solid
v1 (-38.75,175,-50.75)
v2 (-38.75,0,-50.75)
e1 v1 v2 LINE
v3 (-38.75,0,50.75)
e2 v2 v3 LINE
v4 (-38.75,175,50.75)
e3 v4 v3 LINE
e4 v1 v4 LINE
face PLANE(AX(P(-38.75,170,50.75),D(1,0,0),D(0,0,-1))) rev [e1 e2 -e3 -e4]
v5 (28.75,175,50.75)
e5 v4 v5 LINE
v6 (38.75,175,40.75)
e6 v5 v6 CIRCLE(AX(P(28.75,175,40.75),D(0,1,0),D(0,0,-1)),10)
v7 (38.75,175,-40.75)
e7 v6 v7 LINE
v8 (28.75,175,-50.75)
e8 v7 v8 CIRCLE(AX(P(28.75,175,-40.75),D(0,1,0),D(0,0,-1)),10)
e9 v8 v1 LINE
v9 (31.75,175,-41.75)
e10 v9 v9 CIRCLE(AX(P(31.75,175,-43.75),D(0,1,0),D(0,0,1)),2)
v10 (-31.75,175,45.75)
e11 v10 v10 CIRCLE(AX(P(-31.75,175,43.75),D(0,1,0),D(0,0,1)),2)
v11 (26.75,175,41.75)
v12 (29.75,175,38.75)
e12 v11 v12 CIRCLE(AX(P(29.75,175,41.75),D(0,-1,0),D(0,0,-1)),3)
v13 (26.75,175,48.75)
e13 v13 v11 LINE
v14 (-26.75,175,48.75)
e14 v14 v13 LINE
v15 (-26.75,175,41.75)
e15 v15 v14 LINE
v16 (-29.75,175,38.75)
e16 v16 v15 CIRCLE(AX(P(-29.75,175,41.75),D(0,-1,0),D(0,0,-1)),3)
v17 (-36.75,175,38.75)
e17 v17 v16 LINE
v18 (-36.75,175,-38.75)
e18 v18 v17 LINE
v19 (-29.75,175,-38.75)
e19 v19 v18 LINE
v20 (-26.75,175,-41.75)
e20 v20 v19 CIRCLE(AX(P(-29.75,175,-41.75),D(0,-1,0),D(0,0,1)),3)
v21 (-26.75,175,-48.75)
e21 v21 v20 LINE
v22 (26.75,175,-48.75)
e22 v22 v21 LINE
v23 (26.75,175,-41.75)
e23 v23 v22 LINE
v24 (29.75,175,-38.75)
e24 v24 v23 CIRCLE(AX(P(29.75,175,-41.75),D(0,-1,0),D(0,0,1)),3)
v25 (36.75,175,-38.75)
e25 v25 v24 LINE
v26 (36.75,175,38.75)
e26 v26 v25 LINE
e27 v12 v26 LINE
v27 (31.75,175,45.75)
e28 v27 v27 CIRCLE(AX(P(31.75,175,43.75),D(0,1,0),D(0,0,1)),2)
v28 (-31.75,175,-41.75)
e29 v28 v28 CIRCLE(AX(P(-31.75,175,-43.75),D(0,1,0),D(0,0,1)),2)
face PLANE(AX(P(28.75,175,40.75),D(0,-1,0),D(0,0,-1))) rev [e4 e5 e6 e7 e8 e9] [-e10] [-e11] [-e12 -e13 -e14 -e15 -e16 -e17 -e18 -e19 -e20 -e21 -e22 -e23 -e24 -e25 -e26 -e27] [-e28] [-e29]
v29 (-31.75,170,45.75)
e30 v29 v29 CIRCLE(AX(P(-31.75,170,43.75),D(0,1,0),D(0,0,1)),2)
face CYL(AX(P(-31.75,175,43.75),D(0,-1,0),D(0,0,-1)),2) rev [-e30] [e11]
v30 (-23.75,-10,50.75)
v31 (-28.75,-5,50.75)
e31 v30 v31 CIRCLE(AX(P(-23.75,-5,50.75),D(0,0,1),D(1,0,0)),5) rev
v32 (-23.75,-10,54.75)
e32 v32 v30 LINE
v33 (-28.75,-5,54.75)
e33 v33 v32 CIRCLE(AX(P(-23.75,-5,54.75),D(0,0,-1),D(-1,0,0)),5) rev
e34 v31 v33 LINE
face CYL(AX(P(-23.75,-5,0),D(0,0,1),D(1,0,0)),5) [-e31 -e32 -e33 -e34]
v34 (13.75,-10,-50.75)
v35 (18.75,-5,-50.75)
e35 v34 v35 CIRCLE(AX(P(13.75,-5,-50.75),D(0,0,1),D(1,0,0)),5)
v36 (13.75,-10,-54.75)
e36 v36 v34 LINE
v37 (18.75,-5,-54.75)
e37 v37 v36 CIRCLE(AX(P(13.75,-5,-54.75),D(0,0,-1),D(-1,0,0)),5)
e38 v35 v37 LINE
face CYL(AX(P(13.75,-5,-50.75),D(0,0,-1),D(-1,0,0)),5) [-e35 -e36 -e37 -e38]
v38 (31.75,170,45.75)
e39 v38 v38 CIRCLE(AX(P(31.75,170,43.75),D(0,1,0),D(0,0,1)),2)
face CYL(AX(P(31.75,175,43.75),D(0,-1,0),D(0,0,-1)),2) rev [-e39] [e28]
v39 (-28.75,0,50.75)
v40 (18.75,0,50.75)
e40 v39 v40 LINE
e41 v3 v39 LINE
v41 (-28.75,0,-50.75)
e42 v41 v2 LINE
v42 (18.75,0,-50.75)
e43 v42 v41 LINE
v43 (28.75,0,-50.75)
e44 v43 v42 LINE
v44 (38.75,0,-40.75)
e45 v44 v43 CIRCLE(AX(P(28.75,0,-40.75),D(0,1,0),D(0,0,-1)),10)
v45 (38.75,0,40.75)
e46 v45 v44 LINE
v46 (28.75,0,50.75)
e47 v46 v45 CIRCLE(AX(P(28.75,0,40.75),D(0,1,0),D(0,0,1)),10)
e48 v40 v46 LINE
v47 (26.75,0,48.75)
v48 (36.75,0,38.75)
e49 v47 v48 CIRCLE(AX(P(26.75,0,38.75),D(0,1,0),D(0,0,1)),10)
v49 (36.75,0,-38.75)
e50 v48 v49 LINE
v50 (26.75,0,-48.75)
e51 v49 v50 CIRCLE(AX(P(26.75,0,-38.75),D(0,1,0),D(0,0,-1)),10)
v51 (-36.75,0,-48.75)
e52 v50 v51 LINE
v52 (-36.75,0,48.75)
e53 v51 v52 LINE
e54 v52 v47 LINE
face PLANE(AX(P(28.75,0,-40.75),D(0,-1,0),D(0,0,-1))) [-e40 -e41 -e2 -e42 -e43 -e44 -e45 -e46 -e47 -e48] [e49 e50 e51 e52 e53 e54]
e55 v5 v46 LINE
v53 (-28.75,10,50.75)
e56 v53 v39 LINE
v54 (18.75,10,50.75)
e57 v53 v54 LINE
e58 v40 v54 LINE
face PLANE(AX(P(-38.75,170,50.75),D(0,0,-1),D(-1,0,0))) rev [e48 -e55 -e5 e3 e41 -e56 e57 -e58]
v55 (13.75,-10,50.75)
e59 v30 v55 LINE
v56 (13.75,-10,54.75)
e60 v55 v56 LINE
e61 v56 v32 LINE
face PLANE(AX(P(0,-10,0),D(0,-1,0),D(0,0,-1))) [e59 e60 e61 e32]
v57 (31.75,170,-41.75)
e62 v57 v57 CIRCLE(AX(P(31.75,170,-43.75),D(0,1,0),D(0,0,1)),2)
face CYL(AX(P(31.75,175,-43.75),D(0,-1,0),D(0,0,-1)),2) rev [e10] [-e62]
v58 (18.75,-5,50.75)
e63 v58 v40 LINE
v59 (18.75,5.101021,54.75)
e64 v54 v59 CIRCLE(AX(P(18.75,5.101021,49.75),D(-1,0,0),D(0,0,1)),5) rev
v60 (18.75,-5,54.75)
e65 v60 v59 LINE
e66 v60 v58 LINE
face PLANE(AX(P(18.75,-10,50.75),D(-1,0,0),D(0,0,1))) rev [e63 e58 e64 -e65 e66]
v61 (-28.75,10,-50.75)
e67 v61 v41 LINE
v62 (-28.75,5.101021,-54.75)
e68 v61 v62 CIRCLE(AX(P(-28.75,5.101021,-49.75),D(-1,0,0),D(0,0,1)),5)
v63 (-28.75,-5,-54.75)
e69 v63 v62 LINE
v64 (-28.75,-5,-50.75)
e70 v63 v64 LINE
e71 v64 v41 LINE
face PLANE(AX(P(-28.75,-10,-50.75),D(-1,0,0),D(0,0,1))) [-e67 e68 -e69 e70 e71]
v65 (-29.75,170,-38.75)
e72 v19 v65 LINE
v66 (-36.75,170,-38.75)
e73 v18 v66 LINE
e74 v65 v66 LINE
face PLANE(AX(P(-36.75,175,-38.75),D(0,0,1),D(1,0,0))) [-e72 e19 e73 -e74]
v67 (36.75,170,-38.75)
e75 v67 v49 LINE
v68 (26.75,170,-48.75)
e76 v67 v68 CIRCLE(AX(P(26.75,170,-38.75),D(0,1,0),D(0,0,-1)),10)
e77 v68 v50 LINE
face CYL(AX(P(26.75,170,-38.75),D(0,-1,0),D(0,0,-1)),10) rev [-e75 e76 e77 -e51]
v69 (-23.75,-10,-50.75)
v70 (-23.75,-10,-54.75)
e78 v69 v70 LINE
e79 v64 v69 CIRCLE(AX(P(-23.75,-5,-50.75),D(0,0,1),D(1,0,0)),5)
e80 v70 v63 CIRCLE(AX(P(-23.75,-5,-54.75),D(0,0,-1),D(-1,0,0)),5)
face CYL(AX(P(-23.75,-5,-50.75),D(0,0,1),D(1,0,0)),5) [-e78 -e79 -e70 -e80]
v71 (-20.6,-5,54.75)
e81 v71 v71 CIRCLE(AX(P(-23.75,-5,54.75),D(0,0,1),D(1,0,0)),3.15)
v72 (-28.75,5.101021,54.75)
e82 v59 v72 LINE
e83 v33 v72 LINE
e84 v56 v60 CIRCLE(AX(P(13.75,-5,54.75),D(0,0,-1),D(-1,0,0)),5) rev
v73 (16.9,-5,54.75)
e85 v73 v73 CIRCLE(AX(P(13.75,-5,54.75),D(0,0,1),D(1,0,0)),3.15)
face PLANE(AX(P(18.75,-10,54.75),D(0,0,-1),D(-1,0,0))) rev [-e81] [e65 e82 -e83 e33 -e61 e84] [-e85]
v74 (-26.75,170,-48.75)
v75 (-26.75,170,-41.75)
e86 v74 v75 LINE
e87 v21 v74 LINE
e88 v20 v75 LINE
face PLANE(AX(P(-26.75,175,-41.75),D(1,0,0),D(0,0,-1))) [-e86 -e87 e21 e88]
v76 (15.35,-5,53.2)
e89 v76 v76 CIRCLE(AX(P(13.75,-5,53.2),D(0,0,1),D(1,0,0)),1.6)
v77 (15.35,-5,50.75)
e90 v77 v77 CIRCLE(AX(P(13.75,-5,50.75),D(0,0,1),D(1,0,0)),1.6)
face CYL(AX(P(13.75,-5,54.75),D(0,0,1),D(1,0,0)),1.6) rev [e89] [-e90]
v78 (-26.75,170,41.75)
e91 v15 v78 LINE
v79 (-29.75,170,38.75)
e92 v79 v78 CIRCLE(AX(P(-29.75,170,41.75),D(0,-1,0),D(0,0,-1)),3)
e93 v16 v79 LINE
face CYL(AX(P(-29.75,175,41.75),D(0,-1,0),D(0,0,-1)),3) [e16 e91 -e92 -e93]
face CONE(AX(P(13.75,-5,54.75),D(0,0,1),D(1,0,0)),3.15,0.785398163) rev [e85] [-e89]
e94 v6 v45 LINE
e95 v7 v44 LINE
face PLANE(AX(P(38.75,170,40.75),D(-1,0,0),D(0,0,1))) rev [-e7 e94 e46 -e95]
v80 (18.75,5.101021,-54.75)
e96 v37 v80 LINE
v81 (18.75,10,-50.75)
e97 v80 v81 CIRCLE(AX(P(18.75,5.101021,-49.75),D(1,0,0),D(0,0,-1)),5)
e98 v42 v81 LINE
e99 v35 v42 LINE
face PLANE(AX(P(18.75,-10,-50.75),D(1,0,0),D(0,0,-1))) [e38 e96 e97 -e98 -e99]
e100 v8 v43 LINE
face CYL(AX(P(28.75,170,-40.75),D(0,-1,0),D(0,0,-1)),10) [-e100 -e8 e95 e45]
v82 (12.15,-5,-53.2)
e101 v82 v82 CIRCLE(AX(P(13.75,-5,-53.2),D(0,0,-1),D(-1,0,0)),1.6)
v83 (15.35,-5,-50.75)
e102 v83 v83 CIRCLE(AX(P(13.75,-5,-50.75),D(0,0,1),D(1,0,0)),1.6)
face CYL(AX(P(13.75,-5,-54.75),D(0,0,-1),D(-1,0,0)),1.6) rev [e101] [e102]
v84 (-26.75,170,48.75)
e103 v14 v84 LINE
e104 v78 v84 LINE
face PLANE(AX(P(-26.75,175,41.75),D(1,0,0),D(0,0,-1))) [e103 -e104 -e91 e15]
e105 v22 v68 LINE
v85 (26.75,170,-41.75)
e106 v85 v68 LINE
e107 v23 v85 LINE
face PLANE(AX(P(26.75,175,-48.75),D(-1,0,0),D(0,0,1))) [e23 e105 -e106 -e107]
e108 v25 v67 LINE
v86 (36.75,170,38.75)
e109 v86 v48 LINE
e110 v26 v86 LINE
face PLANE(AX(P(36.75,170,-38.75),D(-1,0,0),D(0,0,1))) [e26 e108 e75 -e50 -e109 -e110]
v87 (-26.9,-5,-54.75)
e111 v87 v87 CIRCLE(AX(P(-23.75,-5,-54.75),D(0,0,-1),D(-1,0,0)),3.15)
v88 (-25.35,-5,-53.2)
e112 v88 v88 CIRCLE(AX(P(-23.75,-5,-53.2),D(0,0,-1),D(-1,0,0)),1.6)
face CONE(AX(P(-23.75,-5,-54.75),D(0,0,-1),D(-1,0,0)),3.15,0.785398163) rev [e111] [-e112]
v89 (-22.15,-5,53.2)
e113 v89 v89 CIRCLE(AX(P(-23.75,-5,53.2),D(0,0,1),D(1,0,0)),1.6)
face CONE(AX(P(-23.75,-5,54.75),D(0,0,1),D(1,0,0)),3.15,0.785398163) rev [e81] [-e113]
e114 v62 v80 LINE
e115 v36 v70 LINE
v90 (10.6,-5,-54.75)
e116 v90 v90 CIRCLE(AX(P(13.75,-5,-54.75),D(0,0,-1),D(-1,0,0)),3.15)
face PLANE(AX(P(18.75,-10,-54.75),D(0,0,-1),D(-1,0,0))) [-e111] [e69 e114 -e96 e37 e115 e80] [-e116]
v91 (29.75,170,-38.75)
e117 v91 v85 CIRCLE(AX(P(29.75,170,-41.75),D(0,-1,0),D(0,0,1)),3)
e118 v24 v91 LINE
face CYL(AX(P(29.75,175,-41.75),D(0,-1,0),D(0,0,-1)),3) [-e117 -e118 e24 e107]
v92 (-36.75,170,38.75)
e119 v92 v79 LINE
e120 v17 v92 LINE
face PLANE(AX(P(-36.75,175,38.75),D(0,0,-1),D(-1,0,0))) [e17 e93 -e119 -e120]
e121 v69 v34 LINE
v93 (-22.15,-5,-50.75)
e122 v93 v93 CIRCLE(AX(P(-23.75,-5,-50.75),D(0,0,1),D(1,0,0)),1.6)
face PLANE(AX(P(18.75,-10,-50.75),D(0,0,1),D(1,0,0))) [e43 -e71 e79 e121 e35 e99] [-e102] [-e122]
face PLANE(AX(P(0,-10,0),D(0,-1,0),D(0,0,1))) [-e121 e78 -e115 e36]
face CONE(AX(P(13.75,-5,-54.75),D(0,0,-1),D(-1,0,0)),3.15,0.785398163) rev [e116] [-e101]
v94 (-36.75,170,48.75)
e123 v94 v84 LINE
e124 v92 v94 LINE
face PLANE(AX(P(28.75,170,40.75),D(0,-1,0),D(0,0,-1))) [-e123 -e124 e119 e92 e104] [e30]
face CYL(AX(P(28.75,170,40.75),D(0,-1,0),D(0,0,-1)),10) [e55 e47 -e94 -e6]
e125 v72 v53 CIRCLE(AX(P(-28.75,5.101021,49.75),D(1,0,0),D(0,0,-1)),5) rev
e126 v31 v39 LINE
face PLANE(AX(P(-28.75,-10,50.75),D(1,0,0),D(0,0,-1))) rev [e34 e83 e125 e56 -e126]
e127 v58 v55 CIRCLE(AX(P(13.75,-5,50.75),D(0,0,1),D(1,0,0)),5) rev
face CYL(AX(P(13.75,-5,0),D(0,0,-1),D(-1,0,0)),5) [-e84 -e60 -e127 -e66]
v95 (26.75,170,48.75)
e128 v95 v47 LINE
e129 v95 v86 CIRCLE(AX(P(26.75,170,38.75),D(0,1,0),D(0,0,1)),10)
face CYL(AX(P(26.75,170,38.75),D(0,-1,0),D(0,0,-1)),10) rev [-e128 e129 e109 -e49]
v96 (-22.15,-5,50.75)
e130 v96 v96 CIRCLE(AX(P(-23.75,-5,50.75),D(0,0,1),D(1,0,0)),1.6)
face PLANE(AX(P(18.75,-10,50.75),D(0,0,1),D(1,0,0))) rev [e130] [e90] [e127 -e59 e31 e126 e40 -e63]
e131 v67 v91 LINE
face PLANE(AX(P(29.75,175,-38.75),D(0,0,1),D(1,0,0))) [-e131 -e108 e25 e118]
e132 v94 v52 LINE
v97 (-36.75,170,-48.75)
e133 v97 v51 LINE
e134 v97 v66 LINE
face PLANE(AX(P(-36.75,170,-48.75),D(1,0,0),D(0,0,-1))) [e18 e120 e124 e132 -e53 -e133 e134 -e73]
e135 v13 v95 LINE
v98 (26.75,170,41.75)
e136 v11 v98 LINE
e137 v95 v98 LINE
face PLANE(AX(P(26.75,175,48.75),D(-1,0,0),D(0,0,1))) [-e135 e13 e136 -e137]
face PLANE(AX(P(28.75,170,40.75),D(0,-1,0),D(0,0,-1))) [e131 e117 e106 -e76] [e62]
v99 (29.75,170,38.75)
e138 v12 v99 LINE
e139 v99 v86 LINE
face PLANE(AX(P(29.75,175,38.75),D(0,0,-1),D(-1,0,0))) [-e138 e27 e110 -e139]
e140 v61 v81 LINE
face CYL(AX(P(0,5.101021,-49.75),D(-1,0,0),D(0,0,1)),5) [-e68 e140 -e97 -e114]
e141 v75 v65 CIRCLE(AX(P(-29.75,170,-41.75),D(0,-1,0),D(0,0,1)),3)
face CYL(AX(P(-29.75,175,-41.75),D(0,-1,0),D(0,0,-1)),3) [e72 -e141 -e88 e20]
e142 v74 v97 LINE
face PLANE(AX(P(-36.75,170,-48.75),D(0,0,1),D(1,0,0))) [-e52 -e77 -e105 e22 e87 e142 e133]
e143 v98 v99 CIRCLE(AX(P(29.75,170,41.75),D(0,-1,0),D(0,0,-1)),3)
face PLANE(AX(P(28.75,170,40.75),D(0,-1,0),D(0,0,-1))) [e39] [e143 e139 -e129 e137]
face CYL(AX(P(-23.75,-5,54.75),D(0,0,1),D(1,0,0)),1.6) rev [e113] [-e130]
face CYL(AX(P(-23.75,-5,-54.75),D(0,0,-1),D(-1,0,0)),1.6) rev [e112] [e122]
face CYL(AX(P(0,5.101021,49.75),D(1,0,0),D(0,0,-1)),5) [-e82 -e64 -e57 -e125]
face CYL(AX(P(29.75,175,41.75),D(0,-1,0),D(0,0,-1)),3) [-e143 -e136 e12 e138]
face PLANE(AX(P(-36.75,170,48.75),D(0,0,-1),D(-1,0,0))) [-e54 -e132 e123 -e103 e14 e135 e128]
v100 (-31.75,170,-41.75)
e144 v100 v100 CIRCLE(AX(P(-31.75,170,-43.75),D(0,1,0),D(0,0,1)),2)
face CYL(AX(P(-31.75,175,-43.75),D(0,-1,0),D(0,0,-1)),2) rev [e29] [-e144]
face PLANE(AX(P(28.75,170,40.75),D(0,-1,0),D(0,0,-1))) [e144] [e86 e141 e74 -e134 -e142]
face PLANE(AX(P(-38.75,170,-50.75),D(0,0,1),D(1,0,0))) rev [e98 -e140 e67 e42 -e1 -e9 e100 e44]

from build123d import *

# Parameters (mm, degrees)
BOSS_EXTRUDE1_DEPTH                             = 170
SKETCH3_R                                       = 2
BOSS_EXTRUDE2_DEPTH                             = 5
SKETCH4_W                                       = 47.5
SKETCH4_H                                       = 4
BOSS_EXTRUDE3_DEPTH                             = 20
FILLET1_R                                       = 5
FILLET2_R                                       = 5
CSK_FOR_M3_FLAT_HEAD_MACHINE_SCREW1_D           = 3.2
CSK_FOR_M3_FLAT_HEAD_MACHINE_SCREW1_CSINK_D     = 6.3
CSK_FOR_M3_FLAT_HEAD_MACHINE_SCREW1_CSINK_ANGLE = 90
FILLET1_OF_MIRROR1_R                            = 5
FILLET2_OF_MIRROR1_R                            = 5


with BuildPart() as part:
    # Sketch1 → Boss-Extrude1 (new body)
    with BuildSketch(Plane(origin=(0, 0, 0), x_dir=(1, 0, 0), z_dir=(0, 1, 0))):
        with BuildLine():
            Line((-38.75, -50.75), (28.75, -50.75))
            ThreePointArc((28.75, -50.75), (35.821067812, -47.821067812), (38.75, -40.75))
            Line((38.75, -40.75), (38.75, 40.75))
            ThreePointArc((38.75, 40.75), (35.821067812, 47.821067812), (28.75, 50.75))
            Line((28.75, 50.75), (-38.75, 50.75))
            Line((-38.75, 50.75), (-38.75, -50.75))
        make_face()
        with BuildLine():
            Line((-36.75, 48.75), (26.75, 48.75))
            ThreePointArc((26.75, 48.75), (33.821067812, 45.821067812), (36.75, 38.75))
            Line((36.75, 38.75), (36.75, -38.75))
            ThreePointArc((36.75, -38.75), (33.821067812, -45.821067812), (26.75, -48.75))
            Line((26.75, -48.75), (-36.75, -48.75))
            Line((-36.75, -48.75), (-36.75, 48.75))
        make_face(mode=Mode.SUBTRACT)
    extrude(amount=BOSS_EXTRUDE1_DEPTH)

    # Sketch3 → Boss-Extrude2 (add)
    with BuildSketch(Plane(origin=(0, 170, 0), x_dir=(1, 0, 0), z_dir=(0, 1, 0))):
        with BuildLine():
            Line((-38.75, 50.75), (28.75, 50.75))
            ThreePointArc((28.75, 50.75), (35.821067812, 47.821067812), (38.75, 40.75))
            Line((38.75, 40.75), (38.75, -40.75))
            ThreePointArc((38.75, -40.75), (35.821067812, -47.821067812), (28.75, -50.75))
            Line((28.75, -50.75), (-38.75, -50.75))
            Line((-38.75, -50.75), (-38.75, 50.75))
        make_face()
        with Locations(Location((-31.75, -43.75, 0), (0, 0, 270))):
            Circle(SKETCH3_R, mode=Mode.SUBTRACT)
        with Locations(Location((-31.75, 43.75, 0), (0, 0, 270))):
            Circle(SKETCH3_R, mode=Mode.SUBTRACT)
        with Locations(Location((31.75, 43.75, 0), (0, 0, 270))):
            Circle(SKETCH3_R, mode=Mode.SUBTRACT)
        with Locations(Location((31.75, -43.75, 0), (0, 0, 270))):
            Circle(SKETCH3_R, mode=Mode.SUBTRACT)
        with BuildLine():
            Line((-36.75, 38.75), (-36.75, -38.75))
            Line((-36.75, -38.75), (-29.75, -38.75))
            ThreePointArc((-29.75, -38.75), (-27.628679656, -39.628679656), (-26.75, -41.75))
            Line((-26.75, -41.75), (-26.75, -48.75))
            Line((-26.75, -48.75), (26.75, -48.75))
            Line((26.75, -48.75), (26.75, -41.75))
            ThreePointArc((26.75, -41.75), (27.628679656, -39.628679656), (29.75, -38.75))
            Line((29.75, -38.75), (36.75, -38.75))
            Line((36.75, -38.75), (36.75, 38.75))
            Line((36.75, 38.75), (29.75, 38.75))
            ThreePointArc((29.75, 38.75), (27.628679656, 39.628679656), (26.75, 41.75))
            Line((26.75, 41.75), (26.75, 48.75))
            Line((26.75, 48.75), (-26.75, 48.75))
            Line((-26.75, 48.75), (-26.75, 41.75))
            ThreePointArc((-26.75, 41.75), (-27.628679656, 39.628679656), (-29.75, 38.75))
            Line((-29.75, 38.75), (-36.75, 38.75))
        make_face(mode=Mode.SUBTRACT)
    extrude(amount=BOSS_EXTRUDE2_DEPTH)

    # Sketch4 → Boss-Extrude3 (add)
    with BuildSketch(Plane(origin=(0, 10, 0), x_dir=(-1, 0, 0), z_dir=(0, -1, 0))):
        with Locations((5, -52.75)):
            Rectangle(SKETCH4_W, SKETCH4_H)
    boss_extrude3 = extrude(amount=BOSS_EXTRUDE3_DEPTH)

    # Fillet1
    fillet1_edges = [part.edges().sort_by_distance(p)[0] for p in [
        (18.75, -10, 52.75),
        (-28.75, -10, 52.75),
    ]]
    fillet(fillet1_edges, radius=FILLET1_R)

    # Fillet2
    # the kernel refuses this fillet: 5 mm, written as the material it takes off along each edge
    with BuildSketch(Plane(origin=(-40.997448714, 10, 54.75), x_dir=(0, -1, 0), z_dir=(1, 0, 0))) as fillet2_piece_1:
        with BuildLine():
            CenterArc((4.898979486, 5), FILLET2_R, 191.536959033, 78.463040967)
            Line((0, 4), (-0.09797959, 3.98))
            ThreePointArc((-0.09797959, 3.98), (-0.1, 2), (-0.1, 0))
            Line((-0.1, 0), (0, -0.1))
            Line((0, -0.1), (4.898979486, -0.1))
            Line((4.898979486, -0.1), (4.898979486, 0))
        make_face()
    extrude(amount=71.994897428, mode=Mode.SUBTRACT)

    # CSK for M3 Flat Head Machine Screw1 (through all)
    with Locations(Plane.XY.offset(54.75)):
        with Locations((13.75, -5), (-23.75, -5)):
            csk_for_m3_flat_head_machine_screw1 = CounterSinkHole(CSK_FOR_M3_FLAT_HEAD_MACHINE_SCREW1_D / 2, CSK_FOR_M3_FLAT_HEAD_MACHINE_SCREW1_CSINK_D / 2, counter_sink_angle=CSK_FOR_M3_FLAT_HEAD_MACHINE_SCREW1_CSINK_ANGLE)

    # Mirror1: Boss-Extrude3, CSK for M3 Flat Head Machine Screw1 across plane
    add(boss_extrude3.mirror(Plane.XY))
    add(csk_for_m3_flat_head_machine_screw1.mirror(Plane.XY), mode=Mode.SUBTRACT)

    # Fillet1 of Mirror1
    fillet1_of_mirror1_edges = [part.edges().sort_by_distance(p)[0] for p in [
        (18.75, -10, -52.75),
        (-28.75, -10, -52.75),
    ]]
    fillet(fillet1_of_mirror1_edges, radius=FILLET1_OF_MIRROR1_R)

    # Fillet2 of Mirror1
    # the kernel refuses this fillet: 5 mm, written as the material it takes off along each edge
    with BuildSketch(Plane(origin=(-40.997448714, 10, -54.75), x_dir=(0, -1, 0), z_dir=(1, 0, 0))) as fillet2_of_mirror1_piece_1:
        with BuildLine():
            CenterArc((4.898979486, -5), FILLET2_OF_MIRROR1_R, 90, 78.463040967)
            Line((0, -4), (-0.09797959, -3.98))
            ThreePointArc((-0.09797959, -3.98), (-0.1, -2), (-0.1, 0))
            Line((-0.1, 0), (0, 0.1))
            Line((0, 0.1), (4.898979486, 0.1))
            Line((4.898979486, 0.1), (4.898979486, 0))
        make_face()
    extrude(amount=71.994897428, mode=Mode.SUBTRACT)


solid = part.part
